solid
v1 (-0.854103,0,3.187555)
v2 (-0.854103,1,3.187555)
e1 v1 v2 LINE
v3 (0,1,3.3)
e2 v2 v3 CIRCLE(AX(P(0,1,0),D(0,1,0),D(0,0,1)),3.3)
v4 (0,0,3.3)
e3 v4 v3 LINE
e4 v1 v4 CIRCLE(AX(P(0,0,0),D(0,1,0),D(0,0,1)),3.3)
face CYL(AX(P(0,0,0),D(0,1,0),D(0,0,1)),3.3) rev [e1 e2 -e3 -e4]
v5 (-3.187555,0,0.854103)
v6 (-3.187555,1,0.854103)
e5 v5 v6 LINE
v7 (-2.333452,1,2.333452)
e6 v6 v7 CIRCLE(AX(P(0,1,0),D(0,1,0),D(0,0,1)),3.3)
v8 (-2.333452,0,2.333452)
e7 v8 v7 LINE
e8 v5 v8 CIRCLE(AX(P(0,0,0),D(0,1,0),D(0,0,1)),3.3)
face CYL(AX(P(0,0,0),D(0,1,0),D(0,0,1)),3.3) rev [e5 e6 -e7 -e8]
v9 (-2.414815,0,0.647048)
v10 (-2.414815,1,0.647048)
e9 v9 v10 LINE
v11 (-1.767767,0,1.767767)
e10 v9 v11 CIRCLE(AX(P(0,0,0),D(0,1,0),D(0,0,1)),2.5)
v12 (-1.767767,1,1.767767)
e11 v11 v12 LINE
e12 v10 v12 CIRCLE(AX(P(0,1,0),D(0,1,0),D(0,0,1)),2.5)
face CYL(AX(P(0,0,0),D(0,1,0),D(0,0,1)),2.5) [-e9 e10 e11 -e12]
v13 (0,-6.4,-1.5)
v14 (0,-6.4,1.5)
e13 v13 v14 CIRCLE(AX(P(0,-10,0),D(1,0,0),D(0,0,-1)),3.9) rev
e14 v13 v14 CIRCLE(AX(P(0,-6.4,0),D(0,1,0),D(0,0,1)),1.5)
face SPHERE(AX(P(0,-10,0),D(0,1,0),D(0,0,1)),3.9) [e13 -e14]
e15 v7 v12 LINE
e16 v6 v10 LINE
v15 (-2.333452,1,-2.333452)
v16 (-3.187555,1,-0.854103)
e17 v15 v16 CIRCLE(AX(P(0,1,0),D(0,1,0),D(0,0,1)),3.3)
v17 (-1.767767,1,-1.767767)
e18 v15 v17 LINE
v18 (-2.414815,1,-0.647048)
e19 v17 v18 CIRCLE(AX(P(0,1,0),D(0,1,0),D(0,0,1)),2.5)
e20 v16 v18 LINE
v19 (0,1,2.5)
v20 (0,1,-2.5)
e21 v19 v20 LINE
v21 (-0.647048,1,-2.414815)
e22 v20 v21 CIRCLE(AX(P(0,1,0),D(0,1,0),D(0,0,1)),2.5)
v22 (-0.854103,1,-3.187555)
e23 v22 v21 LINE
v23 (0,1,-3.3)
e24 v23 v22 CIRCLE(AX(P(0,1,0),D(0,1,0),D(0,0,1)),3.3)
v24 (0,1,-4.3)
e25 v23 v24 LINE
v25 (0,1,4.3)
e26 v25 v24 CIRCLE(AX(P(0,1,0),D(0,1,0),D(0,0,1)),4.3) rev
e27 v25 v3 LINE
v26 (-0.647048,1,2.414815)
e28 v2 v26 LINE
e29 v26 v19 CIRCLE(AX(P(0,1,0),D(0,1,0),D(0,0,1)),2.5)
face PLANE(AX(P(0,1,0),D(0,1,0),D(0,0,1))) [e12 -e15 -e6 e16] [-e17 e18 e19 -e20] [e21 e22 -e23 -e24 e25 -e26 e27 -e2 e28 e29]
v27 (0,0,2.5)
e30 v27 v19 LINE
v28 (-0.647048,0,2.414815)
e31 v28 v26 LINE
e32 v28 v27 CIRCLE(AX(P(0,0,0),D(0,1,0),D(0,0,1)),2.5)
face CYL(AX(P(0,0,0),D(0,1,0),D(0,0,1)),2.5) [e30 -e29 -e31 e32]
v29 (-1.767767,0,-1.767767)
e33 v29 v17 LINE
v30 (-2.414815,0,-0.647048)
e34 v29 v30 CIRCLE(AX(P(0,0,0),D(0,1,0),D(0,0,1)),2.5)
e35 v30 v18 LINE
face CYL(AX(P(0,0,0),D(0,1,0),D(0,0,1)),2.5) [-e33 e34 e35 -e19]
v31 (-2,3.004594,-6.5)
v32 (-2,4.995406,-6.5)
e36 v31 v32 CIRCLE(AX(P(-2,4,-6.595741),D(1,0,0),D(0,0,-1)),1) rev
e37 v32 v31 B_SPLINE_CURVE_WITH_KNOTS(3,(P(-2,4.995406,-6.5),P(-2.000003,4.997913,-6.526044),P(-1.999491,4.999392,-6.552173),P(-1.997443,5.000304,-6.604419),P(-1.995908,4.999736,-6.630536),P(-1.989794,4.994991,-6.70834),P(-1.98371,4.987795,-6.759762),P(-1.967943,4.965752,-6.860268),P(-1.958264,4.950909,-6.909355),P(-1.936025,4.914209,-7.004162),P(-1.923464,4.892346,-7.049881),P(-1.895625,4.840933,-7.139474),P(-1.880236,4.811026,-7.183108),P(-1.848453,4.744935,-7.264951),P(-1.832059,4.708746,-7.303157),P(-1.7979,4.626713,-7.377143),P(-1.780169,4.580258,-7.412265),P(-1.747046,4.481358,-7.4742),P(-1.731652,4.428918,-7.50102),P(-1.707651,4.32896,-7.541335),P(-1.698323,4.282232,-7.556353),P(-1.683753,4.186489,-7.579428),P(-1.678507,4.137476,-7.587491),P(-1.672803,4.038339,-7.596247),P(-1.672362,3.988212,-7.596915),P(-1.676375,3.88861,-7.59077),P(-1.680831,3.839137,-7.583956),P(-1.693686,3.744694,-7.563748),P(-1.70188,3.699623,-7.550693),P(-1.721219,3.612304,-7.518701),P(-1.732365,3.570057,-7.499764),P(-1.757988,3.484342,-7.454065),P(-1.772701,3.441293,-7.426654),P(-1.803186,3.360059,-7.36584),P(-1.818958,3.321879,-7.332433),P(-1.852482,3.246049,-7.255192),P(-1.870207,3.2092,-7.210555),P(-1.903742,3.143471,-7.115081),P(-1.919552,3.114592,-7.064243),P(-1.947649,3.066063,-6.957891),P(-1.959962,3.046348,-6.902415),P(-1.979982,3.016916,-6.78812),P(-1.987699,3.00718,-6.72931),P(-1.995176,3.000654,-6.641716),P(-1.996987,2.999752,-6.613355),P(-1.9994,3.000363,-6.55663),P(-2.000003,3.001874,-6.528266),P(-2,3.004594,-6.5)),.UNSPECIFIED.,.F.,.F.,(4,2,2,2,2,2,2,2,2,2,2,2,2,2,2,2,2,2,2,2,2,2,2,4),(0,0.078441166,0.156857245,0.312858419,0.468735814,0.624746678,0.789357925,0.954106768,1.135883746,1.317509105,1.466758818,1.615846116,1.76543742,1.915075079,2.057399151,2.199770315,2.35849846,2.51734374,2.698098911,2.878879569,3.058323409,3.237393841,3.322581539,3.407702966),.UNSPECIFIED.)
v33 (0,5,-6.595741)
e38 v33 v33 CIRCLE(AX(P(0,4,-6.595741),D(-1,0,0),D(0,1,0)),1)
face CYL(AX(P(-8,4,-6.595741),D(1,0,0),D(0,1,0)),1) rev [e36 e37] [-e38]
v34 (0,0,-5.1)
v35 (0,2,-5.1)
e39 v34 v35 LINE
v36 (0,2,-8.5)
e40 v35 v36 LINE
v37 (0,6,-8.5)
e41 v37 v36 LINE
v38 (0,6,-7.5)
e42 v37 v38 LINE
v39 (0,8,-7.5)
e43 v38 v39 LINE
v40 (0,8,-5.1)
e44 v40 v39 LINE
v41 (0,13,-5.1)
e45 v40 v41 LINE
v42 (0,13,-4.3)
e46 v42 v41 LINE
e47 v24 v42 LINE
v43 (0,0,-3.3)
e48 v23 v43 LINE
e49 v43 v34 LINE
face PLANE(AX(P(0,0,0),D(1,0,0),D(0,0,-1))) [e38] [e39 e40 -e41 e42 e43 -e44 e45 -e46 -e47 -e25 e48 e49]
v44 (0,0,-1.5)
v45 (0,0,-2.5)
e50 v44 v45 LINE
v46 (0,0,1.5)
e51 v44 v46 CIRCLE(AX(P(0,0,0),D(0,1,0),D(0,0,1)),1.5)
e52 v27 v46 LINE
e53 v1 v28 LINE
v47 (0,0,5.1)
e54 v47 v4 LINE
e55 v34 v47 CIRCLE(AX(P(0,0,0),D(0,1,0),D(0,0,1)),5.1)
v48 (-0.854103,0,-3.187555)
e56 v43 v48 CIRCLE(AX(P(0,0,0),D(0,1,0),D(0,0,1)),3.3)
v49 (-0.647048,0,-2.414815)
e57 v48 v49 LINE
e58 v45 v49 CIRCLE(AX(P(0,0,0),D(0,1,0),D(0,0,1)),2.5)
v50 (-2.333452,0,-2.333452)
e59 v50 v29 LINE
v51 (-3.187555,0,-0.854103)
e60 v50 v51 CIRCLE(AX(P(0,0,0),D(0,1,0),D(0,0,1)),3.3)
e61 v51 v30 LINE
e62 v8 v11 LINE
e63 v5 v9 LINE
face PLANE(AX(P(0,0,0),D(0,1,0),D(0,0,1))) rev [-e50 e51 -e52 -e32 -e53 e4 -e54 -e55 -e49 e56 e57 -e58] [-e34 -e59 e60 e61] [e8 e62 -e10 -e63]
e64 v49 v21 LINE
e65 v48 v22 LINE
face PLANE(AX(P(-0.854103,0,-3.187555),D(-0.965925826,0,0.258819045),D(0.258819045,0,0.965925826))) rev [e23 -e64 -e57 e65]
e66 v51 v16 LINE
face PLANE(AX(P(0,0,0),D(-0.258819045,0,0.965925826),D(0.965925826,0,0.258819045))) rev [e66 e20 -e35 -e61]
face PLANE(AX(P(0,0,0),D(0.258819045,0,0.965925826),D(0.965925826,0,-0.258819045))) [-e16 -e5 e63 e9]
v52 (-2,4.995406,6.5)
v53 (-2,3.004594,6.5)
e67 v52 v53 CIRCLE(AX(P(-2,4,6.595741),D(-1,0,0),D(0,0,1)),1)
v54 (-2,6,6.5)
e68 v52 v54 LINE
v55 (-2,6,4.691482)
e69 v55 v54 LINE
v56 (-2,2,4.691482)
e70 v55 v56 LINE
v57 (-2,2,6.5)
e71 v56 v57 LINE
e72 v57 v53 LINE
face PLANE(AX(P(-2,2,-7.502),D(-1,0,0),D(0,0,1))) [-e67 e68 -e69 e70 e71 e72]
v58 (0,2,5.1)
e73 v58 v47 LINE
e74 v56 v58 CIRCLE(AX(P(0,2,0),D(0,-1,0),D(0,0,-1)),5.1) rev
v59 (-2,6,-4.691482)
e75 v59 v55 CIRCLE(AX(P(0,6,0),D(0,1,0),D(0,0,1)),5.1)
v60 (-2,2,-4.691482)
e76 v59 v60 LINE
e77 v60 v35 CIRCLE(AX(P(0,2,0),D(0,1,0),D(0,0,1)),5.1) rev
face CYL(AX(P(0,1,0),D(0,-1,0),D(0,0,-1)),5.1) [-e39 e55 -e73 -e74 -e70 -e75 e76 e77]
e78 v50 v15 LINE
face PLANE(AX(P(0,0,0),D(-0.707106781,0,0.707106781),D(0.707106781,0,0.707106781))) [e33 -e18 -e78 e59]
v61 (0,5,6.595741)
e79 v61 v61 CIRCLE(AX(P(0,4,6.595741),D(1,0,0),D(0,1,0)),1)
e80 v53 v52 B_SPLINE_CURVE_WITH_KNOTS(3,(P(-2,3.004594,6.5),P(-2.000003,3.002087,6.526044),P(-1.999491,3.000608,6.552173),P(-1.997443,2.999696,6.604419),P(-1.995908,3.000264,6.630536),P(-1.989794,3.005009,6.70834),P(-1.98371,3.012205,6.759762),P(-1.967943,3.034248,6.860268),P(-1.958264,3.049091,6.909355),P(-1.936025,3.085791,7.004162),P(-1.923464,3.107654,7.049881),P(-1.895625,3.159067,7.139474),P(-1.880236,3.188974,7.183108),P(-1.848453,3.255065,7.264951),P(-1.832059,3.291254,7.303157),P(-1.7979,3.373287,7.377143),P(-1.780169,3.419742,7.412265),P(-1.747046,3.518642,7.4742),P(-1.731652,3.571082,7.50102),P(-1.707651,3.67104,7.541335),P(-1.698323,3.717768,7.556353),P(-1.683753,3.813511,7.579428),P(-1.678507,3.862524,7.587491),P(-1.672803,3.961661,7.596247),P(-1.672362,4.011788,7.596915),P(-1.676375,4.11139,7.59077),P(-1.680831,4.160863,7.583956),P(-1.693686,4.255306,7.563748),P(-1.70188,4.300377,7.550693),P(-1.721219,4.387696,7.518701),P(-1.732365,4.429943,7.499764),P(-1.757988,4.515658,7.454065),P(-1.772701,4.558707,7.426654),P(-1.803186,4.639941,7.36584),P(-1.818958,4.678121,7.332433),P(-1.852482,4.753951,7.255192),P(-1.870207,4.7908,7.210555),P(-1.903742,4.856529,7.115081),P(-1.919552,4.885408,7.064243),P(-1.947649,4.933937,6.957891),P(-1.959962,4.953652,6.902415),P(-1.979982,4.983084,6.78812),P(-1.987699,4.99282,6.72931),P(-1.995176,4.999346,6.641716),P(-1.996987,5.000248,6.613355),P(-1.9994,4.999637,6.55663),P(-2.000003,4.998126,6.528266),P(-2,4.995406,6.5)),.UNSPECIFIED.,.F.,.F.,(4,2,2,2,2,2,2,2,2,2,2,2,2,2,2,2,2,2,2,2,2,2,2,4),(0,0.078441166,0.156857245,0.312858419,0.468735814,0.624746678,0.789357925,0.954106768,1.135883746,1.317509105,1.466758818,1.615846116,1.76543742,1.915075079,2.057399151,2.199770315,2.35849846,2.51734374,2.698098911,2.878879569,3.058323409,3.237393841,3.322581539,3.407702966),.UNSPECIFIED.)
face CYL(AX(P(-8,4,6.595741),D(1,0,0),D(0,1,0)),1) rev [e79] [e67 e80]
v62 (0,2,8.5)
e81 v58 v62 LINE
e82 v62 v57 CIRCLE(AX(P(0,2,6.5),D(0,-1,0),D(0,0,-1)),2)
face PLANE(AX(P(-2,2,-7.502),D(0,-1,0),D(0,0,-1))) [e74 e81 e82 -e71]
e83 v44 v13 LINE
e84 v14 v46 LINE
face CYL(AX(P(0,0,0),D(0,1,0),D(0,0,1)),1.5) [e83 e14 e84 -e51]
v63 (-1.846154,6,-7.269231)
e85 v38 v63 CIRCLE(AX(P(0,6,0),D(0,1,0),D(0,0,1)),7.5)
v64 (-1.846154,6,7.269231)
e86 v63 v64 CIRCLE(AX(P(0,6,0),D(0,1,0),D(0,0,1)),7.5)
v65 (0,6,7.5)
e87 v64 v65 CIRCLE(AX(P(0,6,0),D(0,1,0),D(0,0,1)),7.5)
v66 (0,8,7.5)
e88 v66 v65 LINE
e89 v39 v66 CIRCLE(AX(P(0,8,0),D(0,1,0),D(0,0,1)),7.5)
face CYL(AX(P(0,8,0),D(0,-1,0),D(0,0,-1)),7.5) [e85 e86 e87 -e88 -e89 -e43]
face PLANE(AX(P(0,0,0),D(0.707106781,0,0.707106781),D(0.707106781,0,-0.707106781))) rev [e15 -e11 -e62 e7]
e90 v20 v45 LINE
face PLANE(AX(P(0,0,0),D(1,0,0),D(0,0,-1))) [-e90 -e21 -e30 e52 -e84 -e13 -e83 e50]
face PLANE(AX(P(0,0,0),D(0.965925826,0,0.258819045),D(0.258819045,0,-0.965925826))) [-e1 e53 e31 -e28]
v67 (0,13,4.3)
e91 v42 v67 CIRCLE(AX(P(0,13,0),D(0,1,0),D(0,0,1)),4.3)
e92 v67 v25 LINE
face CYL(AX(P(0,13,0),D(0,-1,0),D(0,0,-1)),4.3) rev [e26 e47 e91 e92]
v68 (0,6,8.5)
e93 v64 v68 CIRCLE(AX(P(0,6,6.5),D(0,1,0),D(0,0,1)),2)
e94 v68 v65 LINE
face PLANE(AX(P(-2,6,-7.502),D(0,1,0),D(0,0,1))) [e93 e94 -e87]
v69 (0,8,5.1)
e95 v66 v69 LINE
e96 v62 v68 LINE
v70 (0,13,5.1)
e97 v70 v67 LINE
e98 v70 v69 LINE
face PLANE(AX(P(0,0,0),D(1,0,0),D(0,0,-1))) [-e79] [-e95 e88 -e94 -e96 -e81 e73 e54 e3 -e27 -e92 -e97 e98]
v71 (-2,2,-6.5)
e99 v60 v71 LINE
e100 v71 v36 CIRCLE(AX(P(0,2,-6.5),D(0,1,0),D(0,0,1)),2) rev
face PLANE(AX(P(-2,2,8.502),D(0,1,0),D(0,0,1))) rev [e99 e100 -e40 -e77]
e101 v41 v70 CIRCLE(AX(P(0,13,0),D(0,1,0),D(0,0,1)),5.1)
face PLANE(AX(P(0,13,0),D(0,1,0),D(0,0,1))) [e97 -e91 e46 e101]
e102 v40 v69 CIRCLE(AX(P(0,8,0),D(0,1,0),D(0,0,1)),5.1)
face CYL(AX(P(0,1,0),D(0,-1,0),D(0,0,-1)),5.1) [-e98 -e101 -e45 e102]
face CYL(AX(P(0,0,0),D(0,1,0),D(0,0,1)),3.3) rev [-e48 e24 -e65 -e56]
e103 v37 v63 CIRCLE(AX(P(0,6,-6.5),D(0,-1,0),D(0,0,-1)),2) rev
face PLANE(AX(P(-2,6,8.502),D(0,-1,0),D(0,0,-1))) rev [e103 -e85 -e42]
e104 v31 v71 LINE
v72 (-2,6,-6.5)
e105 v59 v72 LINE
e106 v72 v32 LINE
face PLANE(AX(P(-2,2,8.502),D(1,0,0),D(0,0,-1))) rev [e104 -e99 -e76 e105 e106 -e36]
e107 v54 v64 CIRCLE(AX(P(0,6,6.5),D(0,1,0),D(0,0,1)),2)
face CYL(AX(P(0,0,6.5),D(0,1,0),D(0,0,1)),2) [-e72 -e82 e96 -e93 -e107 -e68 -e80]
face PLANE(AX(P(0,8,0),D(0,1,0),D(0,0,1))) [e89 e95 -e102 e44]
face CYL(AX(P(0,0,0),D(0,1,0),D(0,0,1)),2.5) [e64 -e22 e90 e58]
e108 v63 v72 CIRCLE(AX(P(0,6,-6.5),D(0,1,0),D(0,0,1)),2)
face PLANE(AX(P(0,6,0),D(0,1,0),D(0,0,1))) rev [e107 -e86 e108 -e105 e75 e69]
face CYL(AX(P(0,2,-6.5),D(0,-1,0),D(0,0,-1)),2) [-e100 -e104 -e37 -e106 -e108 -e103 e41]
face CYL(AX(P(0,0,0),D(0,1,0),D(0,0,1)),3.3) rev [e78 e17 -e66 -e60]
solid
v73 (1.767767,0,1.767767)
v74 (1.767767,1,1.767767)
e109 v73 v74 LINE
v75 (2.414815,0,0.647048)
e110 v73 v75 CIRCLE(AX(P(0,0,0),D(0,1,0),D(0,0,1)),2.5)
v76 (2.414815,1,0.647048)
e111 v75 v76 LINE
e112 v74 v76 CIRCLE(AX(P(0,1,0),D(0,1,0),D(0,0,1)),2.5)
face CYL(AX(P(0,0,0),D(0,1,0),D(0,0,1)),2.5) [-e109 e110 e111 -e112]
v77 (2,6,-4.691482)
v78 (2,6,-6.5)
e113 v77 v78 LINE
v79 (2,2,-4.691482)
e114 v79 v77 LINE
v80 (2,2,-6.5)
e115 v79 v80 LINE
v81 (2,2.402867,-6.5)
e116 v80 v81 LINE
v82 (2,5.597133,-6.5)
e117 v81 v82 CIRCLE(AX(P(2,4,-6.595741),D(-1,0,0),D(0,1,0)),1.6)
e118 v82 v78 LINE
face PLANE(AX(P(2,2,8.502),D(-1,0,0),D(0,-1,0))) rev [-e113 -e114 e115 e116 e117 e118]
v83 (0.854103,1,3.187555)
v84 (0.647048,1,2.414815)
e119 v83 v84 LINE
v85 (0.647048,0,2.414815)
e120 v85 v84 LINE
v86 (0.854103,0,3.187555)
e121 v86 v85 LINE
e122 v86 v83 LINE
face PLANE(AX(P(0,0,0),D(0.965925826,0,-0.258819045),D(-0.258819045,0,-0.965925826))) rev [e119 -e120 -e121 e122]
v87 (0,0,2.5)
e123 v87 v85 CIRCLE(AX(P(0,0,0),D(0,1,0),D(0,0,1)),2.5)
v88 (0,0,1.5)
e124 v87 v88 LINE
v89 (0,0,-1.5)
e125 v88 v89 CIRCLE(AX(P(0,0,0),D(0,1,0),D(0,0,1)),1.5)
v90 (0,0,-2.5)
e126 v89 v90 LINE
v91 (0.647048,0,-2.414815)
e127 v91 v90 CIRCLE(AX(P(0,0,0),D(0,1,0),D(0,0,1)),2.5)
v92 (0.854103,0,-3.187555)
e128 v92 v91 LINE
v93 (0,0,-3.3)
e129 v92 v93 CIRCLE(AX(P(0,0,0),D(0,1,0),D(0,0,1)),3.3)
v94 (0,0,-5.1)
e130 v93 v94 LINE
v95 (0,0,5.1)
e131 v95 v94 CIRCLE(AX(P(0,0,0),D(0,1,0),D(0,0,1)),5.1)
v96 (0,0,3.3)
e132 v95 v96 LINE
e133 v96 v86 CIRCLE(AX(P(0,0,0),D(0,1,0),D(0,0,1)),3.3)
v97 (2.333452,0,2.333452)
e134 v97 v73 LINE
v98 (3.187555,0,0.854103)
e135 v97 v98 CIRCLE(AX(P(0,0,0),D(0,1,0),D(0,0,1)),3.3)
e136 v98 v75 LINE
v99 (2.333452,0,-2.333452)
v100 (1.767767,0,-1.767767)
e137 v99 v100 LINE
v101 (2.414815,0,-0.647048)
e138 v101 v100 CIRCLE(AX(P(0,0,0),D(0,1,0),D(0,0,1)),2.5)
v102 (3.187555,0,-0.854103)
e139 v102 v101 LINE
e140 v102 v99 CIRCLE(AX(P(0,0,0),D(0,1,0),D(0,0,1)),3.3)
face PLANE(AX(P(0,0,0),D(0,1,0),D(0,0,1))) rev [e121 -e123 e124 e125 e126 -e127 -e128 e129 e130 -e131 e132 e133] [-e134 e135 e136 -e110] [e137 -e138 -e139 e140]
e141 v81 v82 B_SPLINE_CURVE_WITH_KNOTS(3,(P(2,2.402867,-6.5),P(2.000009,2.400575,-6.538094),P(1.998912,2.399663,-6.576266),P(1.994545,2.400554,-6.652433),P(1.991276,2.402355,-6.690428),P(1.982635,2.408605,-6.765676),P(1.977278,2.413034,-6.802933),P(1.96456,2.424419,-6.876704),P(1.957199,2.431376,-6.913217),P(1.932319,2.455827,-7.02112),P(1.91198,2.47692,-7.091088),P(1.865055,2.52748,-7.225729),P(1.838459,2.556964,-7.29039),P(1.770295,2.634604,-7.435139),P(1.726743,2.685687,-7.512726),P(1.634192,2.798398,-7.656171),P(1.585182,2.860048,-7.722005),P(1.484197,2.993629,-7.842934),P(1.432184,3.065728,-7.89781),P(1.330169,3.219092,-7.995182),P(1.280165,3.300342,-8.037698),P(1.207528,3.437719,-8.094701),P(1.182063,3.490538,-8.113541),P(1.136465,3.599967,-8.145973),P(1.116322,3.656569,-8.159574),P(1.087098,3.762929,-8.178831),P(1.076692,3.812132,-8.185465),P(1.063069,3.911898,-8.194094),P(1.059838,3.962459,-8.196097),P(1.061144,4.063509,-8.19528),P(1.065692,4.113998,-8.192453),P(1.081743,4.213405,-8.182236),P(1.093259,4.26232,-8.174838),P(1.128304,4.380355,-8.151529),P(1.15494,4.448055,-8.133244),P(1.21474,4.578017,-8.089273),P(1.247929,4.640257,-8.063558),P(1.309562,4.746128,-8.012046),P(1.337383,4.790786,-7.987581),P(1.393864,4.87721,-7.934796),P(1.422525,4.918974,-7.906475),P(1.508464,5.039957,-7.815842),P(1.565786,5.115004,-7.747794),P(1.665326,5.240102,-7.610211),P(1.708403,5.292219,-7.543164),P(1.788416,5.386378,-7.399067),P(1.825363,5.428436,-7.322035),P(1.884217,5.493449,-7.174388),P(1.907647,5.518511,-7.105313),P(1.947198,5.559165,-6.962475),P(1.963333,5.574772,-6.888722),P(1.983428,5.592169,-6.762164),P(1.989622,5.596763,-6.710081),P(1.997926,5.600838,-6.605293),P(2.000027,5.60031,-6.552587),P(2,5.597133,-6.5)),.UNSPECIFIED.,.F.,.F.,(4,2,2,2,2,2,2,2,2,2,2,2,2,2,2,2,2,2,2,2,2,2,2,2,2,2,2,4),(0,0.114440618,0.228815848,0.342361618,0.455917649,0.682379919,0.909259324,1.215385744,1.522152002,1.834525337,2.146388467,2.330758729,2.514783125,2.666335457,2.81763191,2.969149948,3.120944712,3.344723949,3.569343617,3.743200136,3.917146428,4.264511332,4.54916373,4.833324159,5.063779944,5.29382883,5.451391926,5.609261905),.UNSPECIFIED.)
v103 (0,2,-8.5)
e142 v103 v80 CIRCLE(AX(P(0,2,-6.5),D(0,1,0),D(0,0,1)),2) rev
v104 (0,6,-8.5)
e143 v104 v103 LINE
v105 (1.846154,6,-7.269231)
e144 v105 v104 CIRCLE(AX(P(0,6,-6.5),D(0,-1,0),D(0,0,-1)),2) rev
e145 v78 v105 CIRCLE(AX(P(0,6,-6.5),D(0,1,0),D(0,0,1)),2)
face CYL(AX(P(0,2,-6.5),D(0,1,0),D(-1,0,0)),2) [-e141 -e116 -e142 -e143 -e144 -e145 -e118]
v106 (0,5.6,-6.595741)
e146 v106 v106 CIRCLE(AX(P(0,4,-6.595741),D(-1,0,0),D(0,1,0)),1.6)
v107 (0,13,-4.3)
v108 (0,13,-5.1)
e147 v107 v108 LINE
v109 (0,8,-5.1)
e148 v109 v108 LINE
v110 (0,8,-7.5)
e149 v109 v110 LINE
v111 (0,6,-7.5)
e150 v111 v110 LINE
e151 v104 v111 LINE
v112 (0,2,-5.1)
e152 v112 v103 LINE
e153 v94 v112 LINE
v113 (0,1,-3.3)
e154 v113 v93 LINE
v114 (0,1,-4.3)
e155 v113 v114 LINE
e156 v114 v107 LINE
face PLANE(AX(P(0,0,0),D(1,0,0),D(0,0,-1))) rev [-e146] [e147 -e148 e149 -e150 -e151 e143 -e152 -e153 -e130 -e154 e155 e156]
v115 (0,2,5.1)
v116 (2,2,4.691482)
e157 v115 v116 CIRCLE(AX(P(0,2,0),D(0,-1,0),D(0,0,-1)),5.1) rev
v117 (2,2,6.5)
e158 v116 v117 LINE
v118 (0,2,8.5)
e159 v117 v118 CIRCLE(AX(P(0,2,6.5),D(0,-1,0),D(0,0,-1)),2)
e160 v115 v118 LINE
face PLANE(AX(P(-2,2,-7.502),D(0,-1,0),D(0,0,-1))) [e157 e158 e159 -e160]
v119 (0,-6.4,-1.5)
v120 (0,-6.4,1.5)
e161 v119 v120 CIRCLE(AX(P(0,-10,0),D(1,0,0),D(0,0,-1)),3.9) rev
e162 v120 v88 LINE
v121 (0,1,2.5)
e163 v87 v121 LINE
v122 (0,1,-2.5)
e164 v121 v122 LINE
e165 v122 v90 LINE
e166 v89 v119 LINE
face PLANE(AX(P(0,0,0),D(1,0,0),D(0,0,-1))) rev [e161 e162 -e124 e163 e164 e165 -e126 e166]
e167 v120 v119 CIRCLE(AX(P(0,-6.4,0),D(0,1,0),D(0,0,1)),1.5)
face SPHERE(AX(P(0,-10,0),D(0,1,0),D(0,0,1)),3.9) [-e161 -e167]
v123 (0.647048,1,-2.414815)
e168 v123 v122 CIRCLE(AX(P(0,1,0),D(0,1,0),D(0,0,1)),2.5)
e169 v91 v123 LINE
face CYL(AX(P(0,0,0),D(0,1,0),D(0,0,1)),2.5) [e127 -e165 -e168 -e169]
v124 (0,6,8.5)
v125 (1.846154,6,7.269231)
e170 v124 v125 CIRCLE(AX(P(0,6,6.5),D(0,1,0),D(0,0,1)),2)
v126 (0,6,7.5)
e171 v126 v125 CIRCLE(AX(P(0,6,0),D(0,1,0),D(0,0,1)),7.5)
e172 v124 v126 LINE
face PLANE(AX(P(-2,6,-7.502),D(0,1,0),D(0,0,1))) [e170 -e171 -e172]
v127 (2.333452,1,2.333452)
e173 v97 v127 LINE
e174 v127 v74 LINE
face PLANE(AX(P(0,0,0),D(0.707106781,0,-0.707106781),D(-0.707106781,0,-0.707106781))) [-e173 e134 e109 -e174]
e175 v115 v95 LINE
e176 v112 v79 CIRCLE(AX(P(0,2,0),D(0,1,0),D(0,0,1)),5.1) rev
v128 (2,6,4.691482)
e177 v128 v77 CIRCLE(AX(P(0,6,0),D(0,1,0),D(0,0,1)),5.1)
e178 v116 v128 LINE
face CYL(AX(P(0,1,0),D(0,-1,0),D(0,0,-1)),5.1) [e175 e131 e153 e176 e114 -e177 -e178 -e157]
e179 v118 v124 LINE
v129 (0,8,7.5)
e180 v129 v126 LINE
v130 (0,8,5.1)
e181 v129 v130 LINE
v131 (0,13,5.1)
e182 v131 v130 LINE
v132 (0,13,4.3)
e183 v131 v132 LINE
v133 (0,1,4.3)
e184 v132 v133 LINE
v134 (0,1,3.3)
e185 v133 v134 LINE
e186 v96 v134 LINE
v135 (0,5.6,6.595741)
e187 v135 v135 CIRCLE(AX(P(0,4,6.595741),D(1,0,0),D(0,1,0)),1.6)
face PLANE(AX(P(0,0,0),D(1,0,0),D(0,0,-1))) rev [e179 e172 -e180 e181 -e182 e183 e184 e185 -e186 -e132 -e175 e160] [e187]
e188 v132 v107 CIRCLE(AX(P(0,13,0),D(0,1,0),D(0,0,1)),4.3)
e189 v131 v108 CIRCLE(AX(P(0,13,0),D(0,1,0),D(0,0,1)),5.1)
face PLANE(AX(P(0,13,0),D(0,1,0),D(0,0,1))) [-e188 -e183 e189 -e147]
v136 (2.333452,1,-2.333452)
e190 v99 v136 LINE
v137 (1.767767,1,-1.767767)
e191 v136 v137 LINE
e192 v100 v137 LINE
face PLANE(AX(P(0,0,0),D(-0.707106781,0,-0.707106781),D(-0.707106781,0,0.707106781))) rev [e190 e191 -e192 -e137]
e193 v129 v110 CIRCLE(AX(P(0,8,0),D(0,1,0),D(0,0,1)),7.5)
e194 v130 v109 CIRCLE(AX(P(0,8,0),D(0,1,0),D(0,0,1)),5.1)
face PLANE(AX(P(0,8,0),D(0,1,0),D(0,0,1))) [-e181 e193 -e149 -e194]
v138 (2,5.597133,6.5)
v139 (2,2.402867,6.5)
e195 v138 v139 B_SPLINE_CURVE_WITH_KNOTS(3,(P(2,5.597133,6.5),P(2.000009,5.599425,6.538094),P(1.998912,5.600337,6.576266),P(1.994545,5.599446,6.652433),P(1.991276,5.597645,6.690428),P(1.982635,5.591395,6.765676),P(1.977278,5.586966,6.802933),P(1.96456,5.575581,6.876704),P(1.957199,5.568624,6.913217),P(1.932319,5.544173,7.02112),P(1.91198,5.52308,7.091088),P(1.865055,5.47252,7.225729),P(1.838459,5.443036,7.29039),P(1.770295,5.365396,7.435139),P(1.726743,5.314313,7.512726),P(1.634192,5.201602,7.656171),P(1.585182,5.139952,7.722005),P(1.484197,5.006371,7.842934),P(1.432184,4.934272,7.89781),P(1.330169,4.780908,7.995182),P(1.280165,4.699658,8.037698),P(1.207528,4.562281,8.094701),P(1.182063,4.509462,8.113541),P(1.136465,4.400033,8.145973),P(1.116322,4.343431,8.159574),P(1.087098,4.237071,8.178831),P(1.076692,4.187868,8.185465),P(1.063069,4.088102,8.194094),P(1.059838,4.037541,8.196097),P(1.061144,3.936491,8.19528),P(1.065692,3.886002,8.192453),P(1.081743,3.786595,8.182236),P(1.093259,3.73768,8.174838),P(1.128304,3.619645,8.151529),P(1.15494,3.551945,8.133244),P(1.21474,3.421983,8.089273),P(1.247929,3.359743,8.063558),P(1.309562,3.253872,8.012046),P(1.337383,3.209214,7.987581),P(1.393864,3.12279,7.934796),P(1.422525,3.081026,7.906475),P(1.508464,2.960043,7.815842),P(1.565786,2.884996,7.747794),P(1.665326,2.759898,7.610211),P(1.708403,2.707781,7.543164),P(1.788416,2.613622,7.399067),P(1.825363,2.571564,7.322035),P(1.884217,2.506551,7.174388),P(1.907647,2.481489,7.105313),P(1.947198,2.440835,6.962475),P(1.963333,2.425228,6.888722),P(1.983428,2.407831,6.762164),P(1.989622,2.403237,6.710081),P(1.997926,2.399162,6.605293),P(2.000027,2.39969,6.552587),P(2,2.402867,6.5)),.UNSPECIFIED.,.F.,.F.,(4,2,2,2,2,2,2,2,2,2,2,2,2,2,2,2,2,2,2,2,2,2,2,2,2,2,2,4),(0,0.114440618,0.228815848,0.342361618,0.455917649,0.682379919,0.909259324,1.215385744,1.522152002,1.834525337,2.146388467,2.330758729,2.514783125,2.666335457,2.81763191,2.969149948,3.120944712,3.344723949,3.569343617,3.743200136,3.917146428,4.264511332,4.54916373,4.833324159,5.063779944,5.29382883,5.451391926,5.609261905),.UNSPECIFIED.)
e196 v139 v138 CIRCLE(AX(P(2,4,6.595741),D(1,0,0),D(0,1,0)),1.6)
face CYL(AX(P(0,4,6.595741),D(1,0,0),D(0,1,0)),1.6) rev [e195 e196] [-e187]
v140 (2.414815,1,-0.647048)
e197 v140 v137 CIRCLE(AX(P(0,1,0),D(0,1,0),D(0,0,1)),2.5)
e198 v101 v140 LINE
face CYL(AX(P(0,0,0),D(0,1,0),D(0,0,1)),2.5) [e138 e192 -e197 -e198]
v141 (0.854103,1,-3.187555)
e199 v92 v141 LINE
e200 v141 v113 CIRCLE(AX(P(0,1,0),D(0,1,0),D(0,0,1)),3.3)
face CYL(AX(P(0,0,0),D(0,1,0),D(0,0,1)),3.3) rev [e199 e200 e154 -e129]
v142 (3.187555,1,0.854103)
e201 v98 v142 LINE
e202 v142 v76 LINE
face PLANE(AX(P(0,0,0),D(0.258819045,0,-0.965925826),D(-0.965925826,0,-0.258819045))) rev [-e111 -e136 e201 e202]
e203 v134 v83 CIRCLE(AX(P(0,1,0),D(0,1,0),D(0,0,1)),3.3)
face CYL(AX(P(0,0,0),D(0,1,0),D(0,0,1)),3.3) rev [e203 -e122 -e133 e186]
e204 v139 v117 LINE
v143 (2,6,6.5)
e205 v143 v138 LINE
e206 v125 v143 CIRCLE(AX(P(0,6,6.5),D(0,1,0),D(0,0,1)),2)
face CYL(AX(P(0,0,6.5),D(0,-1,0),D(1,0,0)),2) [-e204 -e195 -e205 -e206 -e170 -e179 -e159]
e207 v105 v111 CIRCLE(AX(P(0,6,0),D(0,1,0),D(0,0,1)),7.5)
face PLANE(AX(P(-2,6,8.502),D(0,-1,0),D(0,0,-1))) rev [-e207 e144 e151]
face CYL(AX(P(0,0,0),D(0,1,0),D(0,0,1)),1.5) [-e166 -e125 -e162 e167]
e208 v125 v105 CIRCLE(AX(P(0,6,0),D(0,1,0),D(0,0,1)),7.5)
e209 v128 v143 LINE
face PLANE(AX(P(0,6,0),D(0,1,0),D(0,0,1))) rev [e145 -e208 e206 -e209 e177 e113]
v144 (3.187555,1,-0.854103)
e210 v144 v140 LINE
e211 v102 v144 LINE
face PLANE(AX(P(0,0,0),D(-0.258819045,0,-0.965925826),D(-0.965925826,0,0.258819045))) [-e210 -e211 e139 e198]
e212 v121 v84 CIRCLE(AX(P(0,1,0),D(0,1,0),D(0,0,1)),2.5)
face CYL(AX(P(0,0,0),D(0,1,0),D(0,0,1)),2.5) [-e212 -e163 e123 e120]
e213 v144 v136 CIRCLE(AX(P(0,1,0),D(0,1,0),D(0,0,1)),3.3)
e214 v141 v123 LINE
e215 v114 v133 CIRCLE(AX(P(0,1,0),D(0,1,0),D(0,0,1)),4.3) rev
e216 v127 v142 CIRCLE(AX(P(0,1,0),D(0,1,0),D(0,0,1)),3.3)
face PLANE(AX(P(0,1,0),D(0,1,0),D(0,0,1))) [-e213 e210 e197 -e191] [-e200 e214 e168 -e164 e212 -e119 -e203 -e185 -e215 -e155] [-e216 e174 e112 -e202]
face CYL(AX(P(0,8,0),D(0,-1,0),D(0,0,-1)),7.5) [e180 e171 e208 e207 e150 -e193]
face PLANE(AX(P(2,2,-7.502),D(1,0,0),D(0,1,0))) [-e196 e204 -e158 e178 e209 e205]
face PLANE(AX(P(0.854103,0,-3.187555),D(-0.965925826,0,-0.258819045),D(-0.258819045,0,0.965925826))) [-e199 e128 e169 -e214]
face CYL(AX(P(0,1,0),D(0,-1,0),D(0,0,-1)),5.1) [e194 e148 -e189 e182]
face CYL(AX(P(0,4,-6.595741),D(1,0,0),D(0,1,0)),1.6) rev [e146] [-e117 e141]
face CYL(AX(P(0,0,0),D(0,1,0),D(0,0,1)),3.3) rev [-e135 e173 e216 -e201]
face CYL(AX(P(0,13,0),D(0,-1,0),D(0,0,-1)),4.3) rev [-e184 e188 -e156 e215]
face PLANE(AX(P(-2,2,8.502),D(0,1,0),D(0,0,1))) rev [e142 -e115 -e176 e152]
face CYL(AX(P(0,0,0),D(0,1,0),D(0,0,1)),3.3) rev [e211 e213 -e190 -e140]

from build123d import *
from build123d.topology import SkipClean

# Parameters (mm, degrees)
SKETCH2_R           = 5.1
BOSS_EXTRUDE1_DEPTH = 1
SKETCH3_R           = 5.1
SKETCH3_R_2         = 4.3
BOSS_EXTRUDE2_DEPTH = 12
CUT_EXTRUDE2_DEPTH  = 1
SKETCH7_R           = 7.5
SKETCH7_R_2         = 5.1
BOSS_EXTRUDE4_DEPTH = 2
BOSS_EXTRUDE5_REACH = 24.482
SKETCH11_W          = 4
SKETCH11_H          = 4
CUT_EXTRUDE3_DEPTH  = 10
SKETCH13_3_R        = 1.6
SKETCH13_3_R_2      = 1
CUT_EXTRUDE4_DEPTH  = 2
FILLET1_R           = 2


# Read off the part's stored shape, not the designer's step: Mirror1
with BuildPart() as part:
    # Sketch2 → Boss-Extrude1 (new body)
    with BuildSketch(Plane(origin=(0, 0, 0), x_dir=(1, 0, 0), z_dir=(0, 1, 0))):
        with Locations(Location((0, 0, 0), (0, 0, 270))):
            Circle(SKETCH2_R)
    extrude(amount=BOSS_EXTRUDE1_DEPTH)

    # Sketch3 → Boss-Extrude2 (add)
    with BuildSketch(Plane(origin=(0, 1, 0), x_dir=(1, 0, 0), z_dir=(0, 1, 0))):
        with Locations(Location((0, 0, 0), (0, 0, 270))):
            Circle(SKETCH3_R)
        with Locations(Location((0, 0, 0), (0, 0, 270))):
            Circle(SKETCH3_R_2, mode=Mode.SUBTRACT)
    extrude(amount=BOSS_EXTRUDE2_DEPTH)

    # Sketch6 → Cut-Extrude2 (cut)
    with BuildSketch(Plane(origin=(0, 1, 0), x_dir=(1, 0, 0), z_dir=(0, 1, 0))):
        with BuildLine():
            ThreePointArc((-1.767767, 1.767767), (-2.165064, 1.25), (-2.414815, 0.647048))
            Line((-2.414815, 0.647048), (-3.187555, 0.854103))
            ThreePointArc((-3.187555, 0.854103), (-2.857884, 1.65), (-2.333452, 2.333452))
            Line((-2.333452, 2.333452), (-1.767767, 1.767767))
        make_face()
        with BuildLine():
            ThreePointArc((2.414815, 0.647048), (2.165064, 1.25), (1.767767, 1.767767))
            Line((1.767767, 1.767767), (2.333452, 2.333452))
            ThreePointArc((2.333452, 2.333452), (2.857884, 1.65), (3.187555, 0.854103))
            Line((3.187555, 0.854103), (2.414815, 0.647048))
        make_face()
        with BuildLine():
            ThreePointArc((1.767767, -1.767767), (2.165064, -1.25), (2.414815, -0.647048))
            Line((2.414815, -0.647048), (3.187555, -0.854103))
            ThreePointArc((3.187555, -0.854103), (2.857884, -1.65), (2.333452, -2.333452))
            Line((2.333452, -2.333452), (1.767767, -1.767767))
        make_face()
        with BuildLine():
            ThreePointArc((-0.647048, -2.414815), (0, -2.5), (0.647048, -2.414815))
            Line((0.647048, -2.414815), (0.854103, -3.187555))
            ThreePointArc((0.854103, -3.187555), (0, -3.3), (-0.854103, -3.187555))
            Line((-0.854103, -3.187555), (-0.647048, -2.414815))
        make_face()
        with BuildLine():
            ThreePointArc((-2.414815, -0.647048), (-2.165064, -1.25), (-1.767767, -1.767767))
            Line((-1.767767, -1.767767), (-2.333452, -2.333452))
            ThreePointArc((-2.333452, -2.333452), (-2.857884, -1.65), (-3.187555, -0.854103))
            Line((-3.187555, -0.854103), (-2.414815, -0.647048))
        make_face()
        with BuildLine():
            ThreePointArc((0.647048, 2.414815), (0, 2.5), (-0.647048, 2.414815))
            Line((-0.647048, 2.414815), (-0.854103, 3.187555))
            ThreePointArc((-0.854103, 3.187555), (0, 3.3), (0.854103, 3.187555))
            Line((0.854103, 3.187555), (0.647048, 2.414815))
        make_face()
    extrude(amount=-CUT_EXTRUDE2_DEPTH, mode=Mode.SUBTRACT)

    # Sketch7 → Boss-Extrude4 (add)
    with BuildSketch(Plane(origin=(0, 6, 0), x_dir=(1, 0, 0), z_dir=(0, 1, 0))):
        with Locations(Location((0, 0, 0), (0, 0, 270))):
            Circle(SKETCH7_R)
        with Locations(Location((0, 0, 0), (0, 0, 270))):
            Circle(SKETCH7_R_2, mode=Mode.SUBTRACT)
    extrude(amount=BOSS_EXTRUDE4_DEPTH)

    # Sketch8 → Revolve1 (revolve)
    with SkipClean():  # the faces are left unmerged after this step: merging them gives an invalid solid
        with BuildSketch(Plane(origin=(0, 0, 0), x_dir=(0, 0, -1), z_dir=(1, 0, 0)), mode=Mode.PRIVATE) as revolve1_sk:
            with BuildLine():
                ThreePointArc((1.5, -6.4), (0.764853, -6.175735), (0, -6.1))
                Line((0, -6.1), (0, -10))
                Line((0, -10), (0, -13.9))
                ThreePointArc((0, -13.9), (2.757716, -12.757716), (3.9, -10))
                ThreePointArc((3.9, -10), (3.244996, -7.836669), (1.5, -6.4))
            make_face()
            with BuildLine():
                Line((0, -10), (0, -6.1))
                ThreePointArc((0, -6.1), (-0.764853, -6.175735), (-1.5, -6.4))
                ThreePointArc((-1.5, -6.4), (-3.824265, -10.764853), (0, -13.9))
                Line((0, -13.9), (0, -10))
            make_face()
            with BuildLine():
                Line((0, -6.1), (0, 0))
                Line((0, 0), (-1.5, 0))
                Line((-1.5, 0), (-1.5, -6.4))
                ThreePointArc((-1.5, -6.4), (-0.764853, -6.175735), (0, -6.1))
            make_face()
        revolve(revolve1_sk.sketch.rotate(Axis((0, 0, 0), (0, -1, 0)), 180), axis=Axis((0, 0, 0), (0, -1, 0)))

    # Sketch11 → Boss-Extrude5 (add, up to next)
    with BuildSketch(Plane.XY.offset(8.5), mode=Mode.PRIVATE) as boss_extrude5_sk1:
        with Locations((0, 4)):
            Rectangle(SKETCH11_W, SKETCH11_H)
    boss_extrude5_tool1 = extrude(boss_extrude5_sk1.sketch, amount=-BOSS_EXTRUDE5_REACH, mode=Mode.PRIVATE) - part.part
    add(boss_extrude5_tool1.solids().sort_by_distance((0, 4, 8.5))[0])

    # Sketch13 → Cut-Extrude3 (cut)
    with BuildSketch(Plane(origin=(2, 0, 0), x_dir=(0, 0, -1), z_dir=(1, 0, 0))):
        with BuildLine():
            ThreePointArc((-7.285301, 4.724229), (-7.31997, 3.31044), (-5.906181, 3.275771))
            Line((-5.906181, 3.275771), (-7.285301, 4.724229))
        make_face()
        with BuildLine():
            Line((-7.285301, 4.724229), (-5.906181, 3.275771))
            ThreePointArc((-5.906181, 3.275771), (-5.676622, 3.60602), (-5.595741, 4))
            ThreePointArc((-5.595741, 4), (-6.201761, 4.919119), (-7.285301, 4.724229))
        make_face()
    extrude(amount=-CUT_EXTRUDE3_DEPTH, mode=Mode.SUBTRACT)

    # Sketch13<3> → Cut-Extrude4 (cut)
    with BuildSketch(Plane(origin=(2, 0, 0), x_dir=(0, 0, -1), z_dir=(1, 0, 0))):
        with Locations(Location((-6.595741, 4, 0), (0, 0, 90))):
            Circle(SKETCH13_3_R)
        with Locations(Location((-6.595741, 4, 0), (0, 0, 90))):
            Circle(SKETCH13_3_R_2, mode=Mode.SUBTRACT)
    extrude(amount=-CUT_EXTRUDE4_DEPTH, mode=Mode.SUBTRACT)

    # Fillet1
    # the kernel refuses this fillet: 2 mm, written as the material it takes off along each edge
    with BuildSketch(Plane(origin=(-2, 6, 8.5), x_dir=(1, 0, 0), z_dir=(0, -1, 0)), Plane(origin=(2, -3, 8.5), x_dir=(-1, 0, 0), z_dir=(0, 1, 0))) as fillet1_piece_1:
        with BuildLine():
            CenterArc((FILLET1_R, -FILLET1_R), FILLET1_R, 90, 90)
            Line((0, -FILLET1_R), (0, 0))
            Line((0, 0), (FILLET1_R, 0))
        make_face()
    extrude(amount=9, mode=Mode.SUBTRACT)

    # Mirror1
    split(bisect_by=Plane.XY, keep=Keep.TOP)

    # Mirror1 2: part across plane


with BuildPart() as part_1:
    add(part.part)
    add(part.part.mirror(Plane.XY))


with BuildPart() as body_2:
    # Split1: the piece on the far side of the plane
    add(part_1.part)
    split(bisect_by=Plane(origin=(0, 0, 0), x_dir=(0, 0, 1), z_dir=(1, 0, 0)), keep=Keep.BOTTOM)


with BuildPart() as part_2:
    add(part_1.part)

    # Split1
    split(bisect_by=Plane(origin=(0, 0, 0), x_dir=(0, 0, 1), z_dir=(1, 0, 0)), keep=Keep.TOP)


solid = Compound([body_2.part, part_2.part])
